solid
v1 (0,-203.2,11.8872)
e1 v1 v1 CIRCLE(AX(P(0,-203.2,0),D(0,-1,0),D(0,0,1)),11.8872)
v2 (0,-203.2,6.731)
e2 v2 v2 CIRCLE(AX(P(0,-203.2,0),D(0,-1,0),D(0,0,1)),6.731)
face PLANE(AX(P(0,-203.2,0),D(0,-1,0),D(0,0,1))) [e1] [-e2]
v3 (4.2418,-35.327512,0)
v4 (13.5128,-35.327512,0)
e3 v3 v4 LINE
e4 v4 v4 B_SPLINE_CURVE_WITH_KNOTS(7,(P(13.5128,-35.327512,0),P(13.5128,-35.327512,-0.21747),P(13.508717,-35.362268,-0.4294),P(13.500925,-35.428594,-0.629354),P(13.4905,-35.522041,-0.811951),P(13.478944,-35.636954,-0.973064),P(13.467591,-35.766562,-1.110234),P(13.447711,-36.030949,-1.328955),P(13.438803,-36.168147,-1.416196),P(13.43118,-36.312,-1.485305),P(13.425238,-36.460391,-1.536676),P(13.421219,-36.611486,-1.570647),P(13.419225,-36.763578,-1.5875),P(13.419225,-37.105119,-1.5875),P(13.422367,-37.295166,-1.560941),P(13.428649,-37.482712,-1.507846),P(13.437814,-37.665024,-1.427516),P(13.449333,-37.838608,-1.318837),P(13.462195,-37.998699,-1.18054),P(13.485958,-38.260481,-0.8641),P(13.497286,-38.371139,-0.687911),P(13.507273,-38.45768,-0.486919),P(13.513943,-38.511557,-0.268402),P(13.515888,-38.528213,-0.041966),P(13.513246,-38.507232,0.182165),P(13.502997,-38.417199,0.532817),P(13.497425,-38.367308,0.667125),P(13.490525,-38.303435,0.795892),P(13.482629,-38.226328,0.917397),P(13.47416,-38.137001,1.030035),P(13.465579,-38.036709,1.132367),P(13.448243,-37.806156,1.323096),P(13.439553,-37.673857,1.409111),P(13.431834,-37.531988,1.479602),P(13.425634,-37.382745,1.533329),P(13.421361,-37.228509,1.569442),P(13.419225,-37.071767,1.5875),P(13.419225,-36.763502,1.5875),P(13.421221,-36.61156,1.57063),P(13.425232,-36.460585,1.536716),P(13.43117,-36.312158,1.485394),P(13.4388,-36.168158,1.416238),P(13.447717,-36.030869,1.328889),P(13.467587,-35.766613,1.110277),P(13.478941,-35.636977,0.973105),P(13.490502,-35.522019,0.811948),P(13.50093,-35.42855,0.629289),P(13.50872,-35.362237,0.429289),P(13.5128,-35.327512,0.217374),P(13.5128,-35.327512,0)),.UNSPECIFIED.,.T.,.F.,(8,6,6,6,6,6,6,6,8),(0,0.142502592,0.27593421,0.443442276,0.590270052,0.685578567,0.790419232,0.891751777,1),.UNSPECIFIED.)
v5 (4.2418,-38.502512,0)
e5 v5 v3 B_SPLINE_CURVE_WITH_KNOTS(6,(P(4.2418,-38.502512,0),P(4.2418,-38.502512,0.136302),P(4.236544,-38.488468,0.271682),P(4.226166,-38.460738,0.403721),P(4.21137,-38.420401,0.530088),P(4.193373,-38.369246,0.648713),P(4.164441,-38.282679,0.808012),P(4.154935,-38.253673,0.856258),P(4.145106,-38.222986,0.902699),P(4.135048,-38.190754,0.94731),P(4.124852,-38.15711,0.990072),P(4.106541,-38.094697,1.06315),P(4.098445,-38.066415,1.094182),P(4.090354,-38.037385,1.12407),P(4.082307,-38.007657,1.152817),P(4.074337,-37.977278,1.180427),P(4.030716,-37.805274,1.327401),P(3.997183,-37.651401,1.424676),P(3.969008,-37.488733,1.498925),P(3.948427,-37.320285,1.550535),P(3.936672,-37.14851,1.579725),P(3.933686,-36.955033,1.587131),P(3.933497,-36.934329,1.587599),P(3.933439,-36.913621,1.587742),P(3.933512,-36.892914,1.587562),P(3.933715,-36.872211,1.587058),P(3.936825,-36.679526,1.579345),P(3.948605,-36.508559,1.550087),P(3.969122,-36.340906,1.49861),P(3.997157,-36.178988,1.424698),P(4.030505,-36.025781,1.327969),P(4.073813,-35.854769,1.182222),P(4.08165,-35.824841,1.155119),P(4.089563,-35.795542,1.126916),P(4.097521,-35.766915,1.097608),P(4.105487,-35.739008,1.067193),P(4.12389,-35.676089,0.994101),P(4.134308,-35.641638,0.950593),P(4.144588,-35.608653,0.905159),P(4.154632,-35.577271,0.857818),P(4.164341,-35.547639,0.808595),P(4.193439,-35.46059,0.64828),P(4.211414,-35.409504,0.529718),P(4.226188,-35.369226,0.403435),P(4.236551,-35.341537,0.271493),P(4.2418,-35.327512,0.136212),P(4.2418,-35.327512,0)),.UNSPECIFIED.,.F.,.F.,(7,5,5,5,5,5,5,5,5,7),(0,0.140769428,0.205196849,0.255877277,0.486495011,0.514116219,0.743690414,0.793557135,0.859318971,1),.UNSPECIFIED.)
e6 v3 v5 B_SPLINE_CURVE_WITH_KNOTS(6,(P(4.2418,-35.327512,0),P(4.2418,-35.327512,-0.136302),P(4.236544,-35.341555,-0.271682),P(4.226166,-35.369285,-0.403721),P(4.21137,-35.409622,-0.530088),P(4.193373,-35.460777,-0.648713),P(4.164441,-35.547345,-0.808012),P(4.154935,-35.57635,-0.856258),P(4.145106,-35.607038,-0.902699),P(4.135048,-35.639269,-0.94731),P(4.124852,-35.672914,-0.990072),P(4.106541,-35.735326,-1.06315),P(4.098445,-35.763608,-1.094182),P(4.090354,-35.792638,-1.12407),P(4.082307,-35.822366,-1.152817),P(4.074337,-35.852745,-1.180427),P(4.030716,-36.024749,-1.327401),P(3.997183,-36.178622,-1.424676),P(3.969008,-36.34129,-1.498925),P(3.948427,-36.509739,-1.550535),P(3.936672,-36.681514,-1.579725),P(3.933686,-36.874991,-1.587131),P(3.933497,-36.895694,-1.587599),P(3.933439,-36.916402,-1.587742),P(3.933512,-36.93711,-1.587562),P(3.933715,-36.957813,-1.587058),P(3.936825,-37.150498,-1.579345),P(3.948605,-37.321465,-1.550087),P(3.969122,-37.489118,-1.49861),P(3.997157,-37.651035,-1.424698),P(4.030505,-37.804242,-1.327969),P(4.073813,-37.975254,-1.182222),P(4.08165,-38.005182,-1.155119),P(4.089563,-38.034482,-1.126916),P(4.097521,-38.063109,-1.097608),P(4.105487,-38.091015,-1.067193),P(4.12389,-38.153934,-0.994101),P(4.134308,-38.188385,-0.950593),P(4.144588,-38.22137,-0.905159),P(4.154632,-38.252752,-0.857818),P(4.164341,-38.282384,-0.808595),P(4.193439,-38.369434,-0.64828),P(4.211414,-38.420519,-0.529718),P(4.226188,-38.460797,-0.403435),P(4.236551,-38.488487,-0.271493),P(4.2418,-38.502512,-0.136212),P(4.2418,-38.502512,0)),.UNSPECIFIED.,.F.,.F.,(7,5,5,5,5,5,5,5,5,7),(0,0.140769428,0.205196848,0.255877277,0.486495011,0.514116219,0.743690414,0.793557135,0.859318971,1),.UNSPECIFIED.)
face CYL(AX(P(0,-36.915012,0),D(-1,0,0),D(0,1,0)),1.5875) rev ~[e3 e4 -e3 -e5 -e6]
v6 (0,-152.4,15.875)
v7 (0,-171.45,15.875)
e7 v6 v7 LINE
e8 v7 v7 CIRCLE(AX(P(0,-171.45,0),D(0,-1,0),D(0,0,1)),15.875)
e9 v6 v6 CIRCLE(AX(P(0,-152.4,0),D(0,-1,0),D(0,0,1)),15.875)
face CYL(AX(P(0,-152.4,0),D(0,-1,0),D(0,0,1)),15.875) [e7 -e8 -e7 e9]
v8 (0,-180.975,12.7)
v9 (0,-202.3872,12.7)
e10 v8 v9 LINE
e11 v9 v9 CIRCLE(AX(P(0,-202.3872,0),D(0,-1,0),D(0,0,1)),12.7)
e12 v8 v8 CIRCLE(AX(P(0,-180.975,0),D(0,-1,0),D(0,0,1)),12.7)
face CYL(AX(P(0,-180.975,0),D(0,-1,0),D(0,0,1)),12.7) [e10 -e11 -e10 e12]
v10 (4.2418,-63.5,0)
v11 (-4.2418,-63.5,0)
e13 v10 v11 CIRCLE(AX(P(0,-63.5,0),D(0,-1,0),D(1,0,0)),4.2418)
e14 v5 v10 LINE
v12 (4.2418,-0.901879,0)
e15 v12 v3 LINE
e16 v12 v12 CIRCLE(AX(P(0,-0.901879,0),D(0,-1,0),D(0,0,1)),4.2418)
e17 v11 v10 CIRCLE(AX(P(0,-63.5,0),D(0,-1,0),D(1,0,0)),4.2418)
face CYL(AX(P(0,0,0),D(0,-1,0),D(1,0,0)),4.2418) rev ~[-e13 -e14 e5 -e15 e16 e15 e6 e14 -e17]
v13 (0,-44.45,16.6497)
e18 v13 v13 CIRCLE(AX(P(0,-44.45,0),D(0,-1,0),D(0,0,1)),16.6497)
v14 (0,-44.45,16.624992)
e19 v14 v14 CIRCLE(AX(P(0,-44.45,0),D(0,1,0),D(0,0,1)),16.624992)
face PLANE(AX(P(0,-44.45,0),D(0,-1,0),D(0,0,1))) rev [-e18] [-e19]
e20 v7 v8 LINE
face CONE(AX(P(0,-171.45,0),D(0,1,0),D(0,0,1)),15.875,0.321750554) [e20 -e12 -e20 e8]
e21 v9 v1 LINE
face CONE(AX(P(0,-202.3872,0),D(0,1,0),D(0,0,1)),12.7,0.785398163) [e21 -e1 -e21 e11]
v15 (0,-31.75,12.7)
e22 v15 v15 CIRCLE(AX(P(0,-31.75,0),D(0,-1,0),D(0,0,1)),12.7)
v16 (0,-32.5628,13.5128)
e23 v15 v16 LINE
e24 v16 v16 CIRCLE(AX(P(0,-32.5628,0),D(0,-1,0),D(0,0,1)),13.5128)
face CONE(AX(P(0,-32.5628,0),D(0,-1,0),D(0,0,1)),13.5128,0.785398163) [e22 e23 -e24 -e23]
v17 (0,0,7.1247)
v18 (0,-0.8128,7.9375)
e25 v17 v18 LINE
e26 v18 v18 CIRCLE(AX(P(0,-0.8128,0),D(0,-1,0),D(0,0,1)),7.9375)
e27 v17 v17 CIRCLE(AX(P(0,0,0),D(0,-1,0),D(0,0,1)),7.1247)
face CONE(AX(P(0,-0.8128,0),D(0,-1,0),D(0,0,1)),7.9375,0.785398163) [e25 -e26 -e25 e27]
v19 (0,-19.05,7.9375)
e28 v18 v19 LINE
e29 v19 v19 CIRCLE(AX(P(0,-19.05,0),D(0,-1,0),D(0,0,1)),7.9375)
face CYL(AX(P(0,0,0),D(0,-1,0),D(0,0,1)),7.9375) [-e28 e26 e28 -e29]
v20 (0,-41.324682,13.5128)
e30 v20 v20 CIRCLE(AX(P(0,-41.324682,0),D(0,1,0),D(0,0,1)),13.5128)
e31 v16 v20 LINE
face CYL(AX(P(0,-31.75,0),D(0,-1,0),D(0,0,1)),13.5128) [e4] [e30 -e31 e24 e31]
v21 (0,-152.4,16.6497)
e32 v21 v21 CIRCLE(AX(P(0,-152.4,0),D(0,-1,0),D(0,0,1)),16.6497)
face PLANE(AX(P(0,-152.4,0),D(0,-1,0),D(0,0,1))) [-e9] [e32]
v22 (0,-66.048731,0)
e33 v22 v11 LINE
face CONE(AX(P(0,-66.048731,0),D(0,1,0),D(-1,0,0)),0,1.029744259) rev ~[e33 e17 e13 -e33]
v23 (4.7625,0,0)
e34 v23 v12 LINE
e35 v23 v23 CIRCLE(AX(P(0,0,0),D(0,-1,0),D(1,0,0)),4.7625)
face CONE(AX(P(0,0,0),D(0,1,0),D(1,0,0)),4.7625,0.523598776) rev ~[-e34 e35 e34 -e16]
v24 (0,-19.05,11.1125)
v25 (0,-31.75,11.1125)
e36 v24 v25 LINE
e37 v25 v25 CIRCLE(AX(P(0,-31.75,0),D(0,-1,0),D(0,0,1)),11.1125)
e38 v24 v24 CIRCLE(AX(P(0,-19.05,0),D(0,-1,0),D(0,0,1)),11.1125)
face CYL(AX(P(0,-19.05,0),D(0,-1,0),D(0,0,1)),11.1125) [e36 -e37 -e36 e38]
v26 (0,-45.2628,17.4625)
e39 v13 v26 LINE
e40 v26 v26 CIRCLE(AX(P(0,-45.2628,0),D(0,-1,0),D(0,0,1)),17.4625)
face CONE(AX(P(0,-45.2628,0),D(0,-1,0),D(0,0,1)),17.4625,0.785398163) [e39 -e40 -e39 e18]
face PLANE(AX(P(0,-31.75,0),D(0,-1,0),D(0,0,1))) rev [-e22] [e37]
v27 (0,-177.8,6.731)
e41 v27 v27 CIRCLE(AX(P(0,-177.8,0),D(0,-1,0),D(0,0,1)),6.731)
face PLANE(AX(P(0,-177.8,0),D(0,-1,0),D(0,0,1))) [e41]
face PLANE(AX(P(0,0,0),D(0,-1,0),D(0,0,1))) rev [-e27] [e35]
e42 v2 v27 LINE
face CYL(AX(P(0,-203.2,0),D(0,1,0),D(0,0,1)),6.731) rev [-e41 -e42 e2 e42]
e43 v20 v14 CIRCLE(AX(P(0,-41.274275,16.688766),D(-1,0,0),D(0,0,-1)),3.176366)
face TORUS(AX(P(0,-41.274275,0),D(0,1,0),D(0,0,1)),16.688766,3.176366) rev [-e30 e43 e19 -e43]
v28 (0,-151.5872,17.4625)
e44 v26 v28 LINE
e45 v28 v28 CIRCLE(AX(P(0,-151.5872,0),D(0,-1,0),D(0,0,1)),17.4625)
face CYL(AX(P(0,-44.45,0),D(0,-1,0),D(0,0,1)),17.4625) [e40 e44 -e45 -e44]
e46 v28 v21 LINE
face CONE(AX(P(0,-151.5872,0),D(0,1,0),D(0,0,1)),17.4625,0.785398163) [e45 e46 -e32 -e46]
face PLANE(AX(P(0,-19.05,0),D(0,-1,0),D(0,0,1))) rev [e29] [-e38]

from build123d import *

# Parameters (mm, degrees)
F2_SIZE        = 0.8128
F5_D           = 8.4836
F5_DEPTH       = 63.5
F5_CSINK_D     = 9.525
F5_CSINK_ANGLE = 60
F5_TIP         = 2.5487305738
F7_D           = 3.175
F7_DEPTH       = 38.1
F7_TIP         = 0.9538662327


# Not quite as in the source:
# - a fillet or chamfer that OpenCascade refuses, or shapes differently, is made with other operations: its cross-section is extruded or revolved along the edge and cut away or added


with BuildPart() as f1:
    # F0 (on Right) → F1 (revolve)
    with BuildSketch(Plane.YZ):
        Polygon((-177.8, 0), (0, 0), (0, 7.9375), (-19.05, 7.9375), (-19.05, 11.1125), (-31.75, 11.1125), (-31.75, 13.5128), (-44.45, 13.5128), (-44.45, 17.4625), (-152.4, 17.4625), (-152.4, 15.875), (-171.45, 15.875), (-180.975, 12.7), (-203.2, 12.7), (-203.2, 6.731), (-177.8, 6.731), align=None)
    revolve(axis=Axis((0, -88.9, 0), (0, -1, 0)))

    # F2
    f2_edges = [f1.edges().sort_by_distance(p)[0] for p in [
        (0, -203.2, -12.7),
        (0, -152.4, -17.4625),
        (0, -44.45, -17.4625),
        (0, -31.75, -13.5128),
        (0, 0, -7.9375),
    ]]
    chamfer(f2_edges, length=F2_SIZE)

    # F3: fillet of radius 3.175 on 1 edges, made by hand

    # F3_s1 → F3_t2 (revolve)
    with BuildSketch(Plane.YZ):
        with BuildLine():
            ThreePointArc((-41.2742745857, 13.5124), (-43.5064480149, 14.4289646435), (-44.4503999697, 16.6496950798))
            Line((-44.4503999697, 16.6496950798), (-44.7680125081, 16.6457880193))
            ThreePointArc((-44.7680125081, 16.6457880193), (-44.7676365685, 15.0812475399), (-44.7676365685, 13.5128))
            Line((-44.7676365685, 13.5128), (-44.45, 13.1951634315))
            ThreePointArc((-44.45, 13.1951634315), (-42.8621372928, 13.1951634315), (-41.2742745857, 13.1947634315))
            Line((-41.2742745857, 13.1947634315), (-41.2742745857, 13.5124))
        make_face()
    revolve(axis=Axis((0, -44.45, 0), (0, -1, 0)))

    # F5
    with Locations(Plane(origin=(0, 0, 0), x_dir=(-1, 0, 0), z_dir=(0, 1, 0))):
        with Locations((0, 0)):
            CounterSinkHole(F5_D / 2, F5_CSINK_D / 2, depth=F5_DEPTH, counter_sink_angle=F5_CSINK_ANGLE)
            with Locations((0, 0, -(F5_DEPTH + F5_TIP / 2))):  # 118° drill point
                Cone(0, F5_D / 2, F5_TIP, mode=Mode.SUBTRACT)

    # F7 (one way)
    with BuildSketch(Plane(origin=(0, 0, 0), x_dir=(0, 1, 0), z_dir=(-1, 0, 0))):
        with Locations((-36.915011704, 0)):
            Circle(F7_D / 2)
    extrude(amount=-F7_DEPTH, mode=Mode.SUBTRACT)
    with Locations(Plane(origin=(0, 0, 0), x_dir=(0, 1, 0), z_dir=(-1, 0, 0))):
        with Locations((-36.915011704, 0)):
            with Locations((0, 0, -(F7_DEPTH + F7_TIP / 2))):  # 118° drill point
                Cone(0, F7_D / 2, F7_TIP, mode=Mode.SUBTRACT)


solid = f1.part
